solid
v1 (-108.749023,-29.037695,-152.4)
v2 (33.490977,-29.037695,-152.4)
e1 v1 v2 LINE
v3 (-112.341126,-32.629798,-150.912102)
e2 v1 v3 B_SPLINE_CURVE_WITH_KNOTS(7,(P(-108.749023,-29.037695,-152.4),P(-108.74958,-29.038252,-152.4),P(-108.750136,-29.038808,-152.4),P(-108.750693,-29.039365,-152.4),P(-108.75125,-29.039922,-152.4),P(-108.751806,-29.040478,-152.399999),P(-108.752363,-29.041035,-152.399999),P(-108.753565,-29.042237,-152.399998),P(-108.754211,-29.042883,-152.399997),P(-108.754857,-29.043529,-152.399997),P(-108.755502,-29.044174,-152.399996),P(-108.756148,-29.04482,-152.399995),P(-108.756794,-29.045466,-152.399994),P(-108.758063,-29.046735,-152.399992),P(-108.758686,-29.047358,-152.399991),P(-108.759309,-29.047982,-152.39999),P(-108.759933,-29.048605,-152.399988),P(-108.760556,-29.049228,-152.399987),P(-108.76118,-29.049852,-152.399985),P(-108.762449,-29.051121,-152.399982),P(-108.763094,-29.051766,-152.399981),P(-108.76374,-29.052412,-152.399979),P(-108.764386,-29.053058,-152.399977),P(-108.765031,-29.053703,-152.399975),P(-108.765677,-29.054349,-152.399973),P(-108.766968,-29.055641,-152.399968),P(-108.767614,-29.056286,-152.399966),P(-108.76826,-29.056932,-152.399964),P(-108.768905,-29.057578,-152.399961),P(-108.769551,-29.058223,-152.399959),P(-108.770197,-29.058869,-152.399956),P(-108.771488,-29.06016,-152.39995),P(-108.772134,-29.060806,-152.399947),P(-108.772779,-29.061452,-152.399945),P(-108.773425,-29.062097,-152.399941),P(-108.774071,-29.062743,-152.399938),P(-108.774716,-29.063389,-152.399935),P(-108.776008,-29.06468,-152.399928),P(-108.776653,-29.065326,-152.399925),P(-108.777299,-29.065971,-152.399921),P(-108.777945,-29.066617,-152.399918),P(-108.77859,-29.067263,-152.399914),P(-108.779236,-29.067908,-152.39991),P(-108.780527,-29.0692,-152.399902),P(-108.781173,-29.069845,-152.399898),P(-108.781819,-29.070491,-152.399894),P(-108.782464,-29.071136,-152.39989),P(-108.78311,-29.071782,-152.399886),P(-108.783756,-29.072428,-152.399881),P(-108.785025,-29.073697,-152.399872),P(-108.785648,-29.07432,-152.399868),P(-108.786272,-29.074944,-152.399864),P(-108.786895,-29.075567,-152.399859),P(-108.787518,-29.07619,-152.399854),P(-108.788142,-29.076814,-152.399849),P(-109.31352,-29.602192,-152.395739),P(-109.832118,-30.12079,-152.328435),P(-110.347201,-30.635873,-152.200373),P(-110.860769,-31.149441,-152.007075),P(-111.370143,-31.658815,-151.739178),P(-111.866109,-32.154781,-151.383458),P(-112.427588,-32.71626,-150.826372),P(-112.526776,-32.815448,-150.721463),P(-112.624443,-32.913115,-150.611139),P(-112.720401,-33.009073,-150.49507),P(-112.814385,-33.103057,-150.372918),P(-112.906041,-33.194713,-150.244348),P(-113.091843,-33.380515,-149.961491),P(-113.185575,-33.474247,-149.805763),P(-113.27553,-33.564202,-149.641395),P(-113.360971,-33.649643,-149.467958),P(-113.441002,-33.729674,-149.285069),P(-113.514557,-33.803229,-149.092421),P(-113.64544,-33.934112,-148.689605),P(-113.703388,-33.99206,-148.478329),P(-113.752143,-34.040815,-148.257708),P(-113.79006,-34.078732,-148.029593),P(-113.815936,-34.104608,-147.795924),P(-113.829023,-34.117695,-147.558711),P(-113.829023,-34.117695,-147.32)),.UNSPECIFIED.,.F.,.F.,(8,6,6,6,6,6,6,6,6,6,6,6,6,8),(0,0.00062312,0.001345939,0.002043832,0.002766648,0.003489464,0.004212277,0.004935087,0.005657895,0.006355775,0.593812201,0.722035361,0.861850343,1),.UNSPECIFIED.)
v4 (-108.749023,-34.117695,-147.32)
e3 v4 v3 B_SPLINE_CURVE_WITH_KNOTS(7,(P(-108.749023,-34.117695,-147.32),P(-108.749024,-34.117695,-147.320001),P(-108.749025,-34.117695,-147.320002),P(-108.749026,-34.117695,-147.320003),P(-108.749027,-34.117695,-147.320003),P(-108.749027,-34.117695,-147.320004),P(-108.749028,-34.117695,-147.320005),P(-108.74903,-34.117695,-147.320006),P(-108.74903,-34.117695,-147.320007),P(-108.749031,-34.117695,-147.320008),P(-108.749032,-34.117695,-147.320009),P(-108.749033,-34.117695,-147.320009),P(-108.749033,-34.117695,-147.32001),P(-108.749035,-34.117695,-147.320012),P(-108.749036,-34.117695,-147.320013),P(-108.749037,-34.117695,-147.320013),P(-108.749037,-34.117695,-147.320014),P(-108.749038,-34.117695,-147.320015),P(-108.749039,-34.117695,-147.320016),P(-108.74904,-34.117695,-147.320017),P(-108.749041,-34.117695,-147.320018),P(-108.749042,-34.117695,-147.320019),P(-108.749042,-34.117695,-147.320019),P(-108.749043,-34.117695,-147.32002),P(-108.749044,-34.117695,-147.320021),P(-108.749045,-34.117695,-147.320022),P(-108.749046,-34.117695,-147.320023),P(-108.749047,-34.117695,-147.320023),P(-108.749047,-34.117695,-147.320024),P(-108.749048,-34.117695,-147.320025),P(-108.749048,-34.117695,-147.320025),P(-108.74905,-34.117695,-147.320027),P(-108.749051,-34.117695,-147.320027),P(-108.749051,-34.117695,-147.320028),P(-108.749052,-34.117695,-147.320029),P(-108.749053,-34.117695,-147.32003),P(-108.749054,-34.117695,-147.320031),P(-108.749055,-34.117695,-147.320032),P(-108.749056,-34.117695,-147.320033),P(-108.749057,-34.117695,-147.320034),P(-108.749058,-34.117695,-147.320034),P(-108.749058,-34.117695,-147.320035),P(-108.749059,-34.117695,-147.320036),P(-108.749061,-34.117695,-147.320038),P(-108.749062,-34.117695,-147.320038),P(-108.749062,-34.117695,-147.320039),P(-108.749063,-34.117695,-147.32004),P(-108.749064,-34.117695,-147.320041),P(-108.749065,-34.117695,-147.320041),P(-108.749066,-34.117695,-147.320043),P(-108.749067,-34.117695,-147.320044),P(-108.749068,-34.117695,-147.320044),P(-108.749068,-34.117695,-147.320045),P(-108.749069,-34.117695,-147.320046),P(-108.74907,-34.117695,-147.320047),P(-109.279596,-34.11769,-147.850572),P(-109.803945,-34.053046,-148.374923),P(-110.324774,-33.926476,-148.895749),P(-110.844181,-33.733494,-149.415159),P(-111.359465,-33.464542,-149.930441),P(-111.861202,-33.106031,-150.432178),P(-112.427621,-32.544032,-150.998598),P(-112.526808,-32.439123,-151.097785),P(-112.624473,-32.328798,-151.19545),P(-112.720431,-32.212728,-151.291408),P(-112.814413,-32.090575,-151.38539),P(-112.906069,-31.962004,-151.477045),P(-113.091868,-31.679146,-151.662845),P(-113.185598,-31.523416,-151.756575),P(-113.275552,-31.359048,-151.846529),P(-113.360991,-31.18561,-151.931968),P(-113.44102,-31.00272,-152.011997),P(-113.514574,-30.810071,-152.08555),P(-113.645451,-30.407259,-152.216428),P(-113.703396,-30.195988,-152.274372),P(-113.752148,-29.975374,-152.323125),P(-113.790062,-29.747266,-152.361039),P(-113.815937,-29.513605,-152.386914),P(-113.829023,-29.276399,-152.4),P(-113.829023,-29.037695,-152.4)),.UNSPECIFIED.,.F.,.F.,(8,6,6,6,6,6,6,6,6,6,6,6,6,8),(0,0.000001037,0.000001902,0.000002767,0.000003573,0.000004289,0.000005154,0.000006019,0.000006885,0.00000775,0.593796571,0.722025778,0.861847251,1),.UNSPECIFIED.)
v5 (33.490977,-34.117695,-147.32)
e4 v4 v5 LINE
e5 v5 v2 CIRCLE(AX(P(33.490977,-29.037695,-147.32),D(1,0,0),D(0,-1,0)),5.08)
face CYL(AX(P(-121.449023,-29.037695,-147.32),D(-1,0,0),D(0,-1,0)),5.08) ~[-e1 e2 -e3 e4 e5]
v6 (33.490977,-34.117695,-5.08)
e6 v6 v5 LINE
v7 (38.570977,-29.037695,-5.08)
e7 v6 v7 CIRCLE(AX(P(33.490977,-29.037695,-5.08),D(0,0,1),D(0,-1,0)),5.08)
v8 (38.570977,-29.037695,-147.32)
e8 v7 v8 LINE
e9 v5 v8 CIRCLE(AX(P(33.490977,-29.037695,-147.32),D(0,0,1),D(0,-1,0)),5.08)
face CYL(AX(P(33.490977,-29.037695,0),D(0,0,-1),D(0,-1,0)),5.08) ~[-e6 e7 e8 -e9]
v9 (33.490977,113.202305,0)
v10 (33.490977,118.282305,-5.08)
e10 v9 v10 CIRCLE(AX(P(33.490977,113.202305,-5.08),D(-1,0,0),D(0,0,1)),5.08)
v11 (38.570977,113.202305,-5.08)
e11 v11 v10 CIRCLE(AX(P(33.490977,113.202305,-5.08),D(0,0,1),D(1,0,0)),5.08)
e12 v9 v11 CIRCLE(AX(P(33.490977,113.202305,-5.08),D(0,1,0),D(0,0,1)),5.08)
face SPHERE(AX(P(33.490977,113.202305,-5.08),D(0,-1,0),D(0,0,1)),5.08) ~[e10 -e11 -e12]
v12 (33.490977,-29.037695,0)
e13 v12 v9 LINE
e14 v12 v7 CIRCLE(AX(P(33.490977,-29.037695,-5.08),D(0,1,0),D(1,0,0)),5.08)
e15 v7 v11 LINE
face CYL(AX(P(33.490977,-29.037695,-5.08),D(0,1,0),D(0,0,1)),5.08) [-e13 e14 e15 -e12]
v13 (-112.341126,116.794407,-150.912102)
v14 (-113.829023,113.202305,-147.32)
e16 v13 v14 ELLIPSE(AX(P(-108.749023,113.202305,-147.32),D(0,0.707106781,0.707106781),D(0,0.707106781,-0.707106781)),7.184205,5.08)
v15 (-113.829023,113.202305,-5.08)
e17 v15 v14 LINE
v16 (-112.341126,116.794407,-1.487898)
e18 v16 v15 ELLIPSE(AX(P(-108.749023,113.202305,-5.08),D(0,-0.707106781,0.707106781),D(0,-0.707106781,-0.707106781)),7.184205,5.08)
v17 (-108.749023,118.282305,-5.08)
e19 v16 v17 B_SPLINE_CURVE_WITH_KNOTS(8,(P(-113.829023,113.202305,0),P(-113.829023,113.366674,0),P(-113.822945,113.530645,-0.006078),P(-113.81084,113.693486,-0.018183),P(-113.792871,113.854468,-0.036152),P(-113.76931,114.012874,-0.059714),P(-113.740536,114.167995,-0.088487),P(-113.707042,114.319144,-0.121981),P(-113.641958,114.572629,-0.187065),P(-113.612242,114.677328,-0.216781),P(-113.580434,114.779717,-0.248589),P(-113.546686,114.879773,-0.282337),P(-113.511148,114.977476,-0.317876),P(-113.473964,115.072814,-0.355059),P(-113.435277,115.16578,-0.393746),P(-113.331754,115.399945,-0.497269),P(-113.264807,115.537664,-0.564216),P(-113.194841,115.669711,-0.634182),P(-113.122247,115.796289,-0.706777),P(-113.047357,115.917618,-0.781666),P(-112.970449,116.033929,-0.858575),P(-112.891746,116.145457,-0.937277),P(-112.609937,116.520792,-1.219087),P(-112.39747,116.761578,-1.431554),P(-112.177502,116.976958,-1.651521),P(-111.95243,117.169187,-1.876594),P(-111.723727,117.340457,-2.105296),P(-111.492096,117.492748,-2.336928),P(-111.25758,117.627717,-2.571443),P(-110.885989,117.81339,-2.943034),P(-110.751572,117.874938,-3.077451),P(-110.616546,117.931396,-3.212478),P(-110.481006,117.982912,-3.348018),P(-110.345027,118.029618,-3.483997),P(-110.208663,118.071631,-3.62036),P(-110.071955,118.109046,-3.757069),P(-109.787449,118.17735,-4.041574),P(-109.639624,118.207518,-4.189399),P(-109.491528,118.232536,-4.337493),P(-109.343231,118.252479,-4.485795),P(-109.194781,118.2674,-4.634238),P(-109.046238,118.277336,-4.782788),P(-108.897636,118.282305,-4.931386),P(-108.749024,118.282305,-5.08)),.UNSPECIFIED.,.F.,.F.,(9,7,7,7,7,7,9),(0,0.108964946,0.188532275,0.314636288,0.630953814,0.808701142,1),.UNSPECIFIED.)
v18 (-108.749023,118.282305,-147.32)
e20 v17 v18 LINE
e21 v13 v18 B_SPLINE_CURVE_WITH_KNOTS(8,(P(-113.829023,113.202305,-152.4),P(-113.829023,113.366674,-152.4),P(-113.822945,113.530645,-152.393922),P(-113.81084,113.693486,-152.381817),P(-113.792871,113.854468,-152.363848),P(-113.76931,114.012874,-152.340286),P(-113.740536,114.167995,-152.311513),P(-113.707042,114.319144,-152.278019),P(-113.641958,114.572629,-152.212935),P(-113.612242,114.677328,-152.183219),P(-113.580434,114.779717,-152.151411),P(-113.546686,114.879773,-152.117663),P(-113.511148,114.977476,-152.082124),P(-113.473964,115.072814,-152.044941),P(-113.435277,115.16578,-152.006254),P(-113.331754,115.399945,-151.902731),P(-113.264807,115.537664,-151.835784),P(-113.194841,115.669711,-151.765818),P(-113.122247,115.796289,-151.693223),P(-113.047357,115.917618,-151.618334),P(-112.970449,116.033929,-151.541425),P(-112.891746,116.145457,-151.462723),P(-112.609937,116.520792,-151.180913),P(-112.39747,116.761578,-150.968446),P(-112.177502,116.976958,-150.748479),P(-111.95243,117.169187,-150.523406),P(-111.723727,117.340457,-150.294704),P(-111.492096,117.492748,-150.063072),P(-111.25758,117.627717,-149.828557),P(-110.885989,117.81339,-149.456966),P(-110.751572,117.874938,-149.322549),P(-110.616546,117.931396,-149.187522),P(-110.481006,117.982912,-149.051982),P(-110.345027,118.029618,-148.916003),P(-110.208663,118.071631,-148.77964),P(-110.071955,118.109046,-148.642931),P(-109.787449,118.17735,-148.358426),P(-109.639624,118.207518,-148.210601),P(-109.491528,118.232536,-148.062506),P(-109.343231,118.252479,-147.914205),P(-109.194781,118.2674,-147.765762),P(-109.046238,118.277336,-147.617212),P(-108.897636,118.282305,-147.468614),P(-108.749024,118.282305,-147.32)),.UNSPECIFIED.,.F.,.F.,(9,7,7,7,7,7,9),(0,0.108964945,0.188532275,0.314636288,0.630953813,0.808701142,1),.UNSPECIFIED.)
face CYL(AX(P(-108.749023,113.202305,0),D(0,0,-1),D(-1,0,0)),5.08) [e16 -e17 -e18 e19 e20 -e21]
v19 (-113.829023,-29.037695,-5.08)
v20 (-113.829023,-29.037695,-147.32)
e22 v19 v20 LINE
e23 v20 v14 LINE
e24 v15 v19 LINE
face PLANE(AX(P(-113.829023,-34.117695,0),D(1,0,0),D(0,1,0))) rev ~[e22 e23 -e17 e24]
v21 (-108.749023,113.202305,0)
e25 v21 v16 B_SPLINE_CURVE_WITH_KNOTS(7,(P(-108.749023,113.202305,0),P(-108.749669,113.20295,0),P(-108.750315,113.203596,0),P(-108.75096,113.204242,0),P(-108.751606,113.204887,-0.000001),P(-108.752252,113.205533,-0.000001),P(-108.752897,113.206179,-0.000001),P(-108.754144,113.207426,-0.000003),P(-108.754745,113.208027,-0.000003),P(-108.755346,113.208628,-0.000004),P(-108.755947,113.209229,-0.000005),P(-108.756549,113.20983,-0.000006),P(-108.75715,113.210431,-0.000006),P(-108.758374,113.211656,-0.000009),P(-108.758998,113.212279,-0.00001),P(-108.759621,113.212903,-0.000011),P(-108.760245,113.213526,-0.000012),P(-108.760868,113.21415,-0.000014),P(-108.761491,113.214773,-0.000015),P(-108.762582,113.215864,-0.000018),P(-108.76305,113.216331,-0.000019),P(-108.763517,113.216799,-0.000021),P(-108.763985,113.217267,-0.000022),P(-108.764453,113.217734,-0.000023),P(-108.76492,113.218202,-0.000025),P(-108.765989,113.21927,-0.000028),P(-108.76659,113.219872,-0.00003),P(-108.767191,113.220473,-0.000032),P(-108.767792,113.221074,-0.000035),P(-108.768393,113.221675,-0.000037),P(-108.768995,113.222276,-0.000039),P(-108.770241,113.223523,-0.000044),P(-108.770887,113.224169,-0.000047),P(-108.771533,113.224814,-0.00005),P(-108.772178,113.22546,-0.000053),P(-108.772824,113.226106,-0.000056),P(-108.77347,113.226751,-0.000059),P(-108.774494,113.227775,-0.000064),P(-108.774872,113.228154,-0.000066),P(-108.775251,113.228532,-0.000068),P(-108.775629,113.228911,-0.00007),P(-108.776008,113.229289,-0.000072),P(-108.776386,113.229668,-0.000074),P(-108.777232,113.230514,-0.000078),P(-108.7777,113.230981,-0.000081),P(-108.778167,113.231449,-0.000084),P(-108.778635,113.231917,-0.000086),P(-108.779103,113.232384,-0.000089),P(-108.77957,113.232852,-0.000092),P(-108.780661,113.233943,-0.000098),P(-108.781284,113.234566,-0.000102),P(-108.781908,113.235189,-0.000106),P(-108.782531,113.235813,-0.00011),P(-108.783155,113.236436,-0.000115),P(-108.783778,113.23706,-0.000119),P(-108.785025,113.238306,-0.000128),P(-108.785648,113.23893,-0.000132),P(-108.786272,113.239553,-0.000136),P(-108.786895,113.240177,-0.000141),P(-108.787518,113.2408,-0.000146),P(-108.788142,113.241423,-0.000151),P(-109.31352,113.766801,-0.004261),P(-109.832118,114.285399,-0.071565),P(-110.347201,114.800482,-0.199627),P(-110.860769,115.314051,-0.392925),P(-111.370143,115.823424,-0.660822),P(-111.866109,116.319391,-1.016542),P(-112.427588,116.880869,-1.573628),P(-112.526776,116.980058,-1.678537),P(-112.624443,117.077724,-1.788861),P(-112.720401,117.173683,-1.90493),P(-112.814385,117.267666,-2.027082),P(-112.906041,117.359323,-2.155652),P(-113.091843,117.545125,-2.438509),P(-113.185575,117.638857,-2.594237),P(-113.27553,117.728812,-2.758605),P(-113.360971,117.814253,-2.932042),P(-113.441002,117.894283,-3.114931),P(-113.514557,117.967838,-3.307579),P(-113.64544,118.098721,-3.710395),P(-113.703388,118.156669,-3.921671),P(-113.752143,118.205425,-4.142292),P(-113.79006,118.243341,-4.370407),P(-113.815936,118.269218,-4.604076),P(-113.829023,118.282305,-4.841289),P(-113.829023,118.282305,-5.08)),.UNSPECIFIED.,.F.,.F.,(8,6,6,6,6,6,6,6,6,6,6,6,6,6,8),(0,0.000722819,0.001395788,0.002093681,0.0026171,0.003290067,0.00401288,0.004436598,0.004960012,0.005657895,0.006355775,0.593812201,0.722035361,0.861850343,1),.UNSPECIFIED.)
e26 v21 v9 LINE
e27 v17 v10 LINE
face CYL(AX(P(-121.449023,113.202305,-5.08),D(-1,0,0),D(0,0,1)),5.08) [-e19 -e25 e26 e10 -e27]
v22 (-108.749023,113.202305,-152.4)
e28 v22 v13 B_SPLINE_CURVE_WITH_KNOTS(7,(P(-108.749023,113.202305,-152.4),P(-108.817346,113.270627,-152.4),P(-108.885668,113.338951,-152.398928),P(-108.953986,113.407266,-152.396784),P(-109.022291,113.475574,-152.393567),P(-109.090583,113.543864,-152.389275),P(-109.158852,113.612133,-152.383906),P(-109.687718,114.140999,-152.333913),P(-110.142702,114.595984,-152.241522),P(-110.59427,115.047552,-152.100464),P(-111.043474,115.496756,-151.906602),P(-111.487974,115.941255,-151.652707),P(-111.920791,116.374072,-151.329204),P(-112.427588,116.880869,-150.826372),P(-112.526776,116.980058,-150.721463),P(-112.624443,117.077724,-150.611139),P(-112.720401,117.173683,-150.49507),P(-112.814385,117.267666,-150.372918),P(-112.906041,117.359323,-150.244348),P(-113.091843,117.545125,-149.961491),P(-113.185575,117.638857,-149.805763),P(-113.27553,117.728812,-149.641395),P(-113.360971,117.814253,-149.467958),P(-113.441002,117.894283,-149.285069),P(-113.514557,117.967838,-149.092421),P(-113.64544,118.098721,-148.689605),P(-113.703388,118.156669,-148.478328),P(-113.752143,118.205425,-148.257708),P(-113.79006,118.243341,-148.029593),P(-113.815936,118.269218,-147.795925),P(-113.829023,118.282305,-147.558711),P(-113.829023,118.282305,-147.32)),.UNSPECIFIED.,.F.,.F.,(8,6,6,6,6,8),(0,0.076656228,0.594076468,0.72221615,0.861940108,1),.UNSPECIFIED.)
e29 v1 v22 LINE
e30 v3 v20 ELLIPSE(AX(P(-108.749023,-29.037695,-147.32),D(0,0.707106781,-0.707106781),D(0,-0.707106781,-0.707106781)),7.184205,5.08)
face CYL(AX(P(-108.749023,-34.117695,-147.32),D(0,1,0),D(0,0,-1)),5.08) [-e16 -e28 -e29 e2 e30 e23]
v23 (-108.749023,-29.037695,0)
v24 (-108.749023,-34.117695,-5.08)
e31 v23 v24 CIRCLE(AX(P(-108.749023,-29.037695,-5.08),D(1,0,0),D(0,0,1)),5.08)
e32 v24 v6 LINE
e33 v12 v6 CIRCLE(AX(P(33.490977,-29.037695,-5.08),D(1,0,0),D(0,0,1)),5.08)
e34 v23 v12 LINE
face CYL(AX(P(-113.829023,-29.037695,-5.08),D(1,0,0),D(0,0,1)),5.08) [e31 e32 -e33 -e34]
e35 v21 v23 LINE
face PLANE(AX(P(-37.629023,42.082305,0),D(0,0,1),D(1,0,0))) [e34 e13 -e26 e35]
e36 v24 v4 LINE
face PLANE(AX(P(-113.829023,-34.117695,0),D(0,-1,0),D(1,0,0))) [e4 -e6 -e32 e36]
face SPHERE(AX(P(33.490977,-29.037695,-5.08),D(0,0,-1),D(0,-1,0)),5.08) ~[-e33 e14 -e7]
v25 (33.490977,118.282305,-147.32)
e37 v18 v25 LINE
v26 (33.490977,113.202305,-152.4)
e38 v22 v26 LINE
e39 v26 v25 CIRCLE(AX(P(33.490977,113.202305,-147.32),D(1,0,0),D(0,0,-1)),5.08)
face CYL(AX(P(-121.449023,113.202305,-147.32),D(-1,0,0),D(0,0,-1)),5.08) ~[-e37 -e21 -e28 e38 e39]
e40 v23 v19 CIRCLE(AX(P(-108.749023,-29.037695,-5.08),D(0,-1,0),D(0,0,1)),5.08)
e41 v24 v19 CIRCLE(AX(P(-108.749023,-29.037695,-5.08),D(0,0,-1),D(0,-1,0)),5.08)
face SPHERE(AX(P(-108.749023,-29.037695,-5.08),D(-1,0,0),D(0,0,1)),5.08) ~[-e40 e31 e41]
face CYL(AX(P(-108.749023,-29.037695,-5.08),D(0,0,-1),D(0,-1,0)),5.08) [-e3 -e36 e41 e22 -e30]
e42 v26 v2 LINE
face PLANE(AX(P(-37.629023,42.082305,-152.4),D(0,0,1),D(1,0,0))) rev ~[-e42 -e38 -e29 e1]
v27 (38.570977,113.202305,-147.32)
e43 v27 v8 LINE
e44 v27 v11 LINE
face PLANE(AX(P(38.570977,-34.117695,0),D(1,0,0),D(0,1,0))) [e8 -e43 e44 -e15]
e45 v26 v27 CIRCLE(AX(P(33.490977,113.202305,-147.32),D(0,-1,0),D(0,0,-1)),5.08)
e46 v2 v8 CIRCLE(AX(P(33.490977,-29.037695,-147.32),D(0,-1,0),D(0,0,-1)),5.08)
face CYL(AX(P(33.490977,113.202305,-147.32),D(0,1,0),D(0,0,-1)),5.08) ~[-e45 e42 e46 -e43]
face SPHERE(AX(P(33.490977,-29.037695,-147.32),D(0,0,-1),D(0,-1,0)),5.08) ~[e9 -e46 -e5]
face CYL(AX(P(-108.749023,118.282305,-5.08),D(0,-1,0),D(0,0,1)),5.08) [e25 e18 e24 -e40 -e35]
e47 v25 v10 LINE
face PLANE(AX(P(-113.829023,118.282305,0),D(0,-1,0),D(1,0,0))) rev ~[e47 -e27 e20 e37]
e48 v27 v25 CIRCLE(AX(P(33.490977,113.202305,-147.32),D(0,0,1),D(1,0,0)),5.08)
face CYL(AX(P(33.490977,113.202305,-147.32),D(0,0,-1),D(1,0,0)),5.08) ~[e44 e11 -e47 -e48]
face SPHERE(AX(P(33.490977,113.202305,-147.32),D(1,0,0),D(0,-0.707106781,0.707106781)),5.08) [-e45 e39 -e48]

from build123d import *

# Parameters (mm, degrees)
F0_W         = 152.4
F0_H         = 152.4
F1_DEPTH     = 152.4
F2_R         = 5.08
F3_R         = 5.08
F4_R         = 5.08
F6_T1_DEPTH  = 154.94
F6_T3_DEPTH  = 142.24
F6_T5_DEPTH  = 142.24
F6_S9_W      = 5.1816
F6_S9_H      = 5.1816
F6_T10_DEPTH = 5.1816
F6_T14_ANGLE = 90
F6_T16_ANGLE = 90


# Not quite as in the source:
# - a fillet or chamfer that OpenCascade refuses, or shapes differently, is made with other operations: its cross-section is extruded or revolved along the edge and cut away or added
# - a feature of the source that left no trace in its solid (it failed there, or was rolled back) is left out


with BuildPart() as f1:
    # F0 (on Top) → F1 (new body)
    with BuildSketch(Plane.XY):
        with Locations((-37.6290231943, 42.0823047486)):
            Rectangle(F0_W, F0_H)
    extrude(amount=-F1_DEPTH)

    # F2
    f2_edges = [f1.edges().sort_by_distance(p)[0] for p in [
        (38.570977, -34.117695, -76.2),
    ]]
    fillet(f2_edges, radius=F2_R)

    # F3
    f3_edges = [f1.edges().sort_by_distance(p)[0] for p in [
        (38.570977, 44.622305, 0),
    ]]
    fillet(f3_edges, radius=F3_R)

    # F4
    f4_edges = [f1.edges().sort_by_distance(p)[0] for p in [
        (-113.829023, -34.117695, -78.74),
        (-113.829023, -32.629798, -1.487898),
        (-113.829023, 42.082305, -152.4),
        (-113.829023, 44.622305, 0),
        (-113.829023, 118.282305, -76.2),
    ]]
    fillet(f4_edges, radius=F4_R)

    # F6: fillet of radius 5.08 on 8 edges, made by hand

    # F6_s2 → F6_t1 (cut)
    with BuildSketch(Plane.YZ.offset(-121.4490231943)):
        with BuildLine():
            ThreePointArc((113.2023047486, -152.4), (116.794407197, -150.9121024484), (118.2823047486, -147.32))
            Line((118.2823047486, -147.32), (118.2823047486, -152.4))
            Line((118.2823047486, -152.4), (113.2023047486, -152.4))
        make_face()
        with BuildLine():
            ThreePointArc((113.2023047486, 0), (116.794407197, -1.4878975516), (118.2823047486, -5.08))
            Line((118.2823047486, -5.08), (118.2823047486, 0))
            Line((118.2823047486, 0), (113.2023047486, 0))
        make_face()
        with BuildLine():
            ThreePointArc((-34.1176952514, -147.32), (-32.6297976998, -150.9121024484), (-29.0376952514, -152.4))
            Line((-29.0376952514, -152.4), (-34.1176952514, -152.4))
            Line((-34.1176952514, -152.4), (-34.1176952514, -147.32))
        make_face()
    extrude(amount=F6_T1_DEPTH, mode=Mode.SUBTRACT)

    # F6_s4 → F6_t3 (cut)
    with BuildSketch(Plane.XY.offset(-147.32)):
        with BuildLine():
            ThreePointArc((38.5709768057, 113.2023047486), (37.0830792541, 116.794407197), (33.4909768057, 118.2823047486))
            Line((33.4909768057, 118.2823047486), (38.5709768057, 118.2823047486))
            Line((38.5709768057, 118.2823047486), (38.5709768057, 113.2023047486))
        make_face()
    extrude(amount=F6_T3_DEPTH, mode=Mode.SUBTRACT)

    # F6_s6 → F6_t5 (cut)
    with BuildSketch(Plane.XZ.offset(-113.2023047486)):
        with BuildLine():
            ThreePointArc((33.4909768057, -152.4), (37.0830792541, -150.9121024484), (38.5709768057, -147.32))
            Line((38.5709768057, -147.32), (38.5709768057, -152.4))
            Line((38.5709768057, -152.4), (33.4909768057, -152.4))
        make_face()
    extrude(amount=F6_T5_DEPTH, mode=Mode.SUBTRACT)


with BuildPart() as f6_tool8:
    # F6_s9 → F6_t10 (new body)
    with BuildSketch(Plane.YZ.offset(33.4909768057)):
        with Locations((115.7931047486, -149.9108)):
            Rectangle(F6_S9_W, F6_S9_H)
    extrude(amount=F6_T10_DEPTH)

    # F6_s11 → F6_t12 (revolve, cut)
    with BuildSketch(Plane(origin=(33.4909768057, 113.2023047486, -147.32), x_dir=(0, -0.7071067812, 0.7071067812), z_dir=(0, 0.7071067812, 0.7071067812))):
        with BuildLine():
            ThreePointArc((0, -5.08), (5.08, 0), (0, 5.08))
            Line((0, 5.08), (0, -5.08))
        make_face()
    revolve(axis=Axis((33.4909768057, 113.2023047486, -147.32), (1, 0, 0)), mode=Mode.SUBTRACT)


with BuildPart() as f1_1:
    add(f1.part)

    # F6_t7: cut F6_tool8
    add(f6_tool8.part, mode=Mode.SUBTRACT)

    # F6_s13 → F6_t14 (revolve, cut)
    with BuildSketch(Plane.YZ.offset(33.4909768057)):
        with BuildLine():
            ThreePointArc((118.2823047486, -5.08), (116.794407197, -1.4878975516), (113.2023047486, 0))
            Line((113.2023047486, 0), (118.2823047486, 0))
            Line((118.2823047486, 0), (118.2823047486, -5.08))
        make_face()
    revolve(axis=Axis((33.4909768057, 118.2823047486, -5.08), (0, 1, 0)), revolution_arc=F6_T14_ANGLE, mode=Mode.SUBTRACT)

    # F6_s15 → F6_t16 (revolve, cut)
    with BuildSketch(Plane.YZ.offset(33.4909768057)):
        with BuildLine():
            ThreePointArc((-34.1176952514, -147.32), (-32.6297976998, -150.9121024484), (-29.0376952514, -152.4))
            Line((-29.0376952514, -152.4), (-34.1176952514, -152.4))
            Line((-34.1176952514, -152.4), (-34.1176952514, -147.32))
        make_face()
    revolve(axis=Axis((33.4909768057, -29.0376952514, -152.4), (0, 0, 1)), revolution_arc=F6_T16_ANGLE, mode=Mode.SUBTRACT)


solid = f1_1.part
